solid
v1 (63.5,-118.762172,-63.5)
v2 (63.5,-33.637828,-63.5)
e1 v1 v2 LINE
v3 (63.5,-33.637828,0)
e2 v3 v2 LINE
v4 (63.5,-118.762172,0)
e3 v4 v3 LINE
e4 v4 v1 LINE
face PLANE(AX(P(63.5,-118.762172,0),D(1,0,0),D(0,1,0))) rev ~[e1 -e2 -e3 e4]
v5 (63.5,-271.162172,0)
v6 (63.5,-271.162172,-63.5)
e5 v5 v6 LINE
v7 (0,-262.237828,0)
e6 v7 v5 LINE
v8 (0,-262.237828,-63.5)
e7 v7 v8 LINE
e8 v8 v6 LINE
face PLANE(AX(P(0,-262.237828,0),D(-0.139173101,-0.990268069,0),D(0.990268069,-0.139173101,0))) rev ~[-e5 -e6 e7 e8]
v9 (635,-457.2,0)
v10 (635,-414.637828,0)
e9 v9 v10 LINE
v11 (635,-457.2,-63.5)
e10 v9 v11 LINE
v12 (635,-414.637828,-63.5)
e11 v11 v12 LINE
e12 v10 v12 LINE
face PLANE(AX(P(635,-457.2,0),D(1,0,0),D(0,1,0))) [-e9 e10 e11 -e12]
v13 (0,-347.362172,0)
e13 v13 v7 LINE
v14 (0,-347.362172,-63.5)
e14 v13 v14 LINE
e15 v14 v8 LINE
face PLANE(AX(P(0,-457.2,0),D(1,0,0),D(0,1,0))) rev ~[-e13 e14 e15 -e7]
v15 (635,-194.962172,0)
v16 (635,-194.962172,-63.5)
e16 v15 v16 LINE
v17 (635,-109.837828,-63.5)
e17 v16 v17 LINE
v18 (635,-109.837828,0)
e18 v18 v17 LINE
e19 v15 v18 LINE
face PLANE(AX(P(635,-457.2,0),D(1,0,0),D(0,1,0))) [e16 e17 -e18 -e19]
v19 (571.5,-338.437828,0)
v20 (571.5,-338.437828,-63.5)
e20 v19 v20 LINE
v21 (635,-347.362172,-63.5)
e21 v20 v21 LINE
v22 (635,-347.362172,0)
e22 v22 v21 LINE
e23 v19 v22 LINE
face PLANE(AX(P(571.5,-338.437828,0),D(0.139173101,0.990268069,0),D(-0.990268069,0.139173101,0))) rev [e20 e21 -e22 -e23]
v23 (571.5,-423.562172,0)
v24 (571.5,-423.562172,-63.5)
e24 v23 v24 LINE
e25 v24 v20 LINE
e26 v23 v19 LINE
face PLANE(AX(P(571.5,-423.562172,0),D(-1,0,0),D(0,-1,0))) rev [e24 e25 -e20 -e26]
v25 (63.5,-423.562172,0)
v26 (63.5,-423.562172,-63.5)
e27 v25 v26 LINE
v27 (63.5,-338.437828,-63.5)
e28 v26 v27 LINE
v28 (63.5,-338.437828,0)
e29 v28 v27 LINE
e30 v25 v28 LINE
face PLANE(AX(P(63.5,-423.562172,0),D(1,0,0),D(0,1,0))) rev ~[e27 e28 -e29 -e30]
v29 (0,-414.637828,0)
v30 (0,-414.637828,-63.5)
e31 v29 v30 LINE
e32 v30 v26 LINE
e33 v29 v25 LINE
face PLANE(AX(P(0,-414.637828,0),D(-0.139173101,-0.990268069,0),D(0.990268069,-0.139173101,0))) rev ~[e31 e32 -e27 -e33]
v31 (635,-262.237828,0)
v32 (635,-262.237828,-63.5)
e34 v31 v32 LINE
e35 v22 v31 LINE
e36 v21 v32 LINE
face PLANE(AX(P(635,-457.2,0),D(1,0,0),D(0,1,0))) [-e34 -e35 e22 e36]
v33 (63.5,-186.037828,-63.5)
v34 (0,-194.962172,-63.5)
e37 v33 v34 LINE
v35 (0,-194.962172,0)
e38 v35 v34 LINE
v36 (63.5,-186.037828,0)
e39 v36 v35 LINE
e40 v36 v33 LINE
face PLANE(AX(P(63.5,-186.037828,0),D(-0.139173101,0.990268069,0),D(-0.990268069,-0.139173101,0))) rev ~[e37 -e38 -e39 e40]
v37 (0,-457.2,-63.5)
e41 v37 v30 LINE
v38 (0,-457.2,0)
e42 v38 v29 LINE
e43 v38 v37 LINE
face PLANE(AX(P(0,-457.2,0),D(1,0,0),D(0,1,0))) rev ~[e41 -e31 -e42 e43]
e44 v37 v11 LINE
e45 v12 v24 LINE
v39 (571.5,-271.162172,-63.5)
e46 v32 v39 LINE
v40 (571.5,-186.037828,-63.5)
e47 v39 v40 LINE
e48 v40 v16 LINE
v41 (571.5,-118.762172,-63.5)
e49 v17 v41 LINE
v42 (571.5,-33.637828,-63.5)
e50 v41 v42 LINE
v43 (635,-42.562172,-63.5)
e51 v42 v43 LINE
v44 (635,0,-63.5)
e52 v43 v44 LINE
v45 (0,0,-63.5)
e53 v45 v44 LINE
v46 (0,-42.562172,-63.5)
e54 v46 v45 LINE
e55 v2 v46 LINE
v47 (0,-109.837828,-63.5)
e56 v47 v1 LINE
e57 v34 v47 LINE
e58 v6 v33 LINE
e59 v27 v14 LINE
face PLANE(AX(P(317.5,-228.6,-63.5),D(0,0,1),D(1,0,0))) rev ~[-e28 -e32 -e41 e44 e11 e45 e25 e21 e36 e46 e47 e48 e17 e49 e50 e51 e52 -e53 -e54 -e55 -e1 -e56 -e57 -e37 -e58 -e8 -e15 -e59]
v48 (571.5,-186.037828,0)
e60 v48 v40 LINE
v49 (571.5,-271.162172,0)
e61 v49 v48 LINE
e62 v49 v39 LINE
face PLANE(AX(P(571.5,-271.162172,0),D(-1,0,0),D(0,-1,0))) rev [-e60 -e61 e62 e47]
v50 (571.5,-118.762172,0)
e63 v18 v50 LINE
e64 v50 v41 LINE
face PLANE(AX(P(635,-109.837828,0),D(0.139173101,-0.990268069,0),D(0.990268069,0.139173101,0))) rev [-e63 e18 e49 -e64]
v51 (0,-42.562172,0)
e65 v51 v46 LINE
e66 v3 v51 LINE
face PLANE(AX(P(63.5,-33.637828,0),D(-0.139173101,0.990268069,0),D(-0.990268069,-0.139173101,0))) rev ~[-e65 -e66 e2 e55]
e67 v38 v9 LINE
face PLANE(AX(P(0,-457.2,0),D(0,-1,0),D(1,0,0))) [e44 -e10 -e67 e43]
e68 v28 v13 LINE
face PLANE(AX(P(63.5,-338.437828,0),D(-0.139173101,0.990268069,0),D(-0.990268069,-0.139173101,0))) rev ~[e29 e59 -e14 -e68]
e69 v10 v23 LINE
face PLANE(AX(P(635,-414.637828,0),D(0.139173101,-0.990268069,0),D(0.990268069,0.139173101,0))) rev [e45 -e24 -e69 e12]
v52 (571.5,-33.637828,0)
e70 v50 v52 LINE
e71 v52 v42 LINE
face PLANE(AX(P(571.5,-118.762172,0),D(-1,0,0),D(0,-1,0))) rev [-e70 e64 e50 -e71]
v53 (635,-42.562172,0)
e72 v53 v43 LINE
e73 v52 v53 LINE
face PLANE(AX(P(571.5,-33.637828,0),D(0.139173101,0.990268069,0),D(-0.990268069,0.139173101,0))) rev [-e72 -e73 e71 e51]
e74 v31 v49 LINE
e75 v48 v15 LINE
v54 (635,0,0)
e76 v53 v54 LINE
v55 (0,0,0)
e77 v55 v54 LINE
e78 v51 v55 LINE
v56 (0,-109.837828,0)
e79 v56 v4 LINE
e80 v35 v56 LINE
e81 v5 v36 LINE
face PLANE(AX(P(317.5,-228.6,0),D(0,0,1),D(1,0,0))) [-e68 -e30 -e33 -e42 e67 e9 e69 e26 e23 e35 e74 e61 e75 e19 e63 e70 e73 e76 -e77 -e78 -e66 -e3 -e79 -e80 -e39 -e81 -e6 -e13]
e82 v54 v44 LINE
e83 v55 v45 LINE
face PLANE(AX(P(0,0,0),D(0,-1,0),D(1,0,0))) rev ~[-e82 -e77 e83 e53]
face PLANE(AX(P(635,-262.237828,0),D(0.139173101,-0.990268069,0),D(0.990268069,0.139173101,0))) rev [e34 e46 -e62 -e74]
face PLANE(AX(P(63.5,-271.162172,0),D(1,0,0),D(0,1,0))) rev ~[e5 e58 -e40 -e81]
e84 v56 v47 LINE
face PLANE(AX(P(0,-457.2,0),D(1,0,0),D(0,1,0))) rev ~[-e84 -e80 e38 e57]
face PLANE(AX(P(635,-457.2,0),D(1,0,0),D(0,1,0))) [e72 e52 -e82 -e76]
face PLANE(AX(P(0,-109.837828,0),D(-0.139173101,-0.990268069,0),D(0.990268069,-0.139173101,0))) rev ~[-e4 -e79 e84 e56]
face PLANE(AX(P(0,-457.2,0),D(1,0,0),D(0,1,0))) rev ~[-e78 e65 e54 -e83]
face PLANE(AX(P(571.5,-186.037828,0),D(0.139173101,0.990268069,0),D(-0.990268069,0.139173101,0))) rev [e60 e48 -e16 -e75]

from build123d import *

# Parameters (mm, degrees)
F0_W     = 635
F0_H     = 457.2
F1_DEPTH = 63.5
F3_DEPTH = 63.501


# Not quite as in the source:
# - a pattern or mirror of a feature is missing from the dataset's text; its kind, count and spacing are read off the source's solid


with BuildPart() as f1:
    # F0 (on Top) → F1 (new body)
    with BuildSketch(Plane.XY):
        with Locations((317.5, -228.6)):
            Rectangle(F0_W, F0_H)
    extrude(amount=-F1_DEPTH)

    # F2 (on Top) → F3 (cut, through all)
    with BuildSketch(Plane.XY):
        Polygon((63.5, -33.6378284982), (0, -42.5621715018), (0, -109.8378284982), (63.5, -118.7621715018), align=None)
        Polygon((63.5, -186.0378284982), (0, -194.9621715018), (0, -262.2378284982), (63.5, -271.1621715018), align=None)
        Polygon((63.5, -338.4378284982), (0, -347.3621715018), (0, -414.6378284982), (63.5, -423.5621715018), align=None)
    f3 = extrude(amount=-F3_DEPTH, mode=Mode.SUBTRACT)

    # F3_copies: F3 across plane
    add(f3.mirror(Plane(origin=(317.5, 0, 0), x_dir=(0, 0, 1), z_dir=(1, 0, 0))), mode=Mode.SUBTRACT)


solid = f1.part
